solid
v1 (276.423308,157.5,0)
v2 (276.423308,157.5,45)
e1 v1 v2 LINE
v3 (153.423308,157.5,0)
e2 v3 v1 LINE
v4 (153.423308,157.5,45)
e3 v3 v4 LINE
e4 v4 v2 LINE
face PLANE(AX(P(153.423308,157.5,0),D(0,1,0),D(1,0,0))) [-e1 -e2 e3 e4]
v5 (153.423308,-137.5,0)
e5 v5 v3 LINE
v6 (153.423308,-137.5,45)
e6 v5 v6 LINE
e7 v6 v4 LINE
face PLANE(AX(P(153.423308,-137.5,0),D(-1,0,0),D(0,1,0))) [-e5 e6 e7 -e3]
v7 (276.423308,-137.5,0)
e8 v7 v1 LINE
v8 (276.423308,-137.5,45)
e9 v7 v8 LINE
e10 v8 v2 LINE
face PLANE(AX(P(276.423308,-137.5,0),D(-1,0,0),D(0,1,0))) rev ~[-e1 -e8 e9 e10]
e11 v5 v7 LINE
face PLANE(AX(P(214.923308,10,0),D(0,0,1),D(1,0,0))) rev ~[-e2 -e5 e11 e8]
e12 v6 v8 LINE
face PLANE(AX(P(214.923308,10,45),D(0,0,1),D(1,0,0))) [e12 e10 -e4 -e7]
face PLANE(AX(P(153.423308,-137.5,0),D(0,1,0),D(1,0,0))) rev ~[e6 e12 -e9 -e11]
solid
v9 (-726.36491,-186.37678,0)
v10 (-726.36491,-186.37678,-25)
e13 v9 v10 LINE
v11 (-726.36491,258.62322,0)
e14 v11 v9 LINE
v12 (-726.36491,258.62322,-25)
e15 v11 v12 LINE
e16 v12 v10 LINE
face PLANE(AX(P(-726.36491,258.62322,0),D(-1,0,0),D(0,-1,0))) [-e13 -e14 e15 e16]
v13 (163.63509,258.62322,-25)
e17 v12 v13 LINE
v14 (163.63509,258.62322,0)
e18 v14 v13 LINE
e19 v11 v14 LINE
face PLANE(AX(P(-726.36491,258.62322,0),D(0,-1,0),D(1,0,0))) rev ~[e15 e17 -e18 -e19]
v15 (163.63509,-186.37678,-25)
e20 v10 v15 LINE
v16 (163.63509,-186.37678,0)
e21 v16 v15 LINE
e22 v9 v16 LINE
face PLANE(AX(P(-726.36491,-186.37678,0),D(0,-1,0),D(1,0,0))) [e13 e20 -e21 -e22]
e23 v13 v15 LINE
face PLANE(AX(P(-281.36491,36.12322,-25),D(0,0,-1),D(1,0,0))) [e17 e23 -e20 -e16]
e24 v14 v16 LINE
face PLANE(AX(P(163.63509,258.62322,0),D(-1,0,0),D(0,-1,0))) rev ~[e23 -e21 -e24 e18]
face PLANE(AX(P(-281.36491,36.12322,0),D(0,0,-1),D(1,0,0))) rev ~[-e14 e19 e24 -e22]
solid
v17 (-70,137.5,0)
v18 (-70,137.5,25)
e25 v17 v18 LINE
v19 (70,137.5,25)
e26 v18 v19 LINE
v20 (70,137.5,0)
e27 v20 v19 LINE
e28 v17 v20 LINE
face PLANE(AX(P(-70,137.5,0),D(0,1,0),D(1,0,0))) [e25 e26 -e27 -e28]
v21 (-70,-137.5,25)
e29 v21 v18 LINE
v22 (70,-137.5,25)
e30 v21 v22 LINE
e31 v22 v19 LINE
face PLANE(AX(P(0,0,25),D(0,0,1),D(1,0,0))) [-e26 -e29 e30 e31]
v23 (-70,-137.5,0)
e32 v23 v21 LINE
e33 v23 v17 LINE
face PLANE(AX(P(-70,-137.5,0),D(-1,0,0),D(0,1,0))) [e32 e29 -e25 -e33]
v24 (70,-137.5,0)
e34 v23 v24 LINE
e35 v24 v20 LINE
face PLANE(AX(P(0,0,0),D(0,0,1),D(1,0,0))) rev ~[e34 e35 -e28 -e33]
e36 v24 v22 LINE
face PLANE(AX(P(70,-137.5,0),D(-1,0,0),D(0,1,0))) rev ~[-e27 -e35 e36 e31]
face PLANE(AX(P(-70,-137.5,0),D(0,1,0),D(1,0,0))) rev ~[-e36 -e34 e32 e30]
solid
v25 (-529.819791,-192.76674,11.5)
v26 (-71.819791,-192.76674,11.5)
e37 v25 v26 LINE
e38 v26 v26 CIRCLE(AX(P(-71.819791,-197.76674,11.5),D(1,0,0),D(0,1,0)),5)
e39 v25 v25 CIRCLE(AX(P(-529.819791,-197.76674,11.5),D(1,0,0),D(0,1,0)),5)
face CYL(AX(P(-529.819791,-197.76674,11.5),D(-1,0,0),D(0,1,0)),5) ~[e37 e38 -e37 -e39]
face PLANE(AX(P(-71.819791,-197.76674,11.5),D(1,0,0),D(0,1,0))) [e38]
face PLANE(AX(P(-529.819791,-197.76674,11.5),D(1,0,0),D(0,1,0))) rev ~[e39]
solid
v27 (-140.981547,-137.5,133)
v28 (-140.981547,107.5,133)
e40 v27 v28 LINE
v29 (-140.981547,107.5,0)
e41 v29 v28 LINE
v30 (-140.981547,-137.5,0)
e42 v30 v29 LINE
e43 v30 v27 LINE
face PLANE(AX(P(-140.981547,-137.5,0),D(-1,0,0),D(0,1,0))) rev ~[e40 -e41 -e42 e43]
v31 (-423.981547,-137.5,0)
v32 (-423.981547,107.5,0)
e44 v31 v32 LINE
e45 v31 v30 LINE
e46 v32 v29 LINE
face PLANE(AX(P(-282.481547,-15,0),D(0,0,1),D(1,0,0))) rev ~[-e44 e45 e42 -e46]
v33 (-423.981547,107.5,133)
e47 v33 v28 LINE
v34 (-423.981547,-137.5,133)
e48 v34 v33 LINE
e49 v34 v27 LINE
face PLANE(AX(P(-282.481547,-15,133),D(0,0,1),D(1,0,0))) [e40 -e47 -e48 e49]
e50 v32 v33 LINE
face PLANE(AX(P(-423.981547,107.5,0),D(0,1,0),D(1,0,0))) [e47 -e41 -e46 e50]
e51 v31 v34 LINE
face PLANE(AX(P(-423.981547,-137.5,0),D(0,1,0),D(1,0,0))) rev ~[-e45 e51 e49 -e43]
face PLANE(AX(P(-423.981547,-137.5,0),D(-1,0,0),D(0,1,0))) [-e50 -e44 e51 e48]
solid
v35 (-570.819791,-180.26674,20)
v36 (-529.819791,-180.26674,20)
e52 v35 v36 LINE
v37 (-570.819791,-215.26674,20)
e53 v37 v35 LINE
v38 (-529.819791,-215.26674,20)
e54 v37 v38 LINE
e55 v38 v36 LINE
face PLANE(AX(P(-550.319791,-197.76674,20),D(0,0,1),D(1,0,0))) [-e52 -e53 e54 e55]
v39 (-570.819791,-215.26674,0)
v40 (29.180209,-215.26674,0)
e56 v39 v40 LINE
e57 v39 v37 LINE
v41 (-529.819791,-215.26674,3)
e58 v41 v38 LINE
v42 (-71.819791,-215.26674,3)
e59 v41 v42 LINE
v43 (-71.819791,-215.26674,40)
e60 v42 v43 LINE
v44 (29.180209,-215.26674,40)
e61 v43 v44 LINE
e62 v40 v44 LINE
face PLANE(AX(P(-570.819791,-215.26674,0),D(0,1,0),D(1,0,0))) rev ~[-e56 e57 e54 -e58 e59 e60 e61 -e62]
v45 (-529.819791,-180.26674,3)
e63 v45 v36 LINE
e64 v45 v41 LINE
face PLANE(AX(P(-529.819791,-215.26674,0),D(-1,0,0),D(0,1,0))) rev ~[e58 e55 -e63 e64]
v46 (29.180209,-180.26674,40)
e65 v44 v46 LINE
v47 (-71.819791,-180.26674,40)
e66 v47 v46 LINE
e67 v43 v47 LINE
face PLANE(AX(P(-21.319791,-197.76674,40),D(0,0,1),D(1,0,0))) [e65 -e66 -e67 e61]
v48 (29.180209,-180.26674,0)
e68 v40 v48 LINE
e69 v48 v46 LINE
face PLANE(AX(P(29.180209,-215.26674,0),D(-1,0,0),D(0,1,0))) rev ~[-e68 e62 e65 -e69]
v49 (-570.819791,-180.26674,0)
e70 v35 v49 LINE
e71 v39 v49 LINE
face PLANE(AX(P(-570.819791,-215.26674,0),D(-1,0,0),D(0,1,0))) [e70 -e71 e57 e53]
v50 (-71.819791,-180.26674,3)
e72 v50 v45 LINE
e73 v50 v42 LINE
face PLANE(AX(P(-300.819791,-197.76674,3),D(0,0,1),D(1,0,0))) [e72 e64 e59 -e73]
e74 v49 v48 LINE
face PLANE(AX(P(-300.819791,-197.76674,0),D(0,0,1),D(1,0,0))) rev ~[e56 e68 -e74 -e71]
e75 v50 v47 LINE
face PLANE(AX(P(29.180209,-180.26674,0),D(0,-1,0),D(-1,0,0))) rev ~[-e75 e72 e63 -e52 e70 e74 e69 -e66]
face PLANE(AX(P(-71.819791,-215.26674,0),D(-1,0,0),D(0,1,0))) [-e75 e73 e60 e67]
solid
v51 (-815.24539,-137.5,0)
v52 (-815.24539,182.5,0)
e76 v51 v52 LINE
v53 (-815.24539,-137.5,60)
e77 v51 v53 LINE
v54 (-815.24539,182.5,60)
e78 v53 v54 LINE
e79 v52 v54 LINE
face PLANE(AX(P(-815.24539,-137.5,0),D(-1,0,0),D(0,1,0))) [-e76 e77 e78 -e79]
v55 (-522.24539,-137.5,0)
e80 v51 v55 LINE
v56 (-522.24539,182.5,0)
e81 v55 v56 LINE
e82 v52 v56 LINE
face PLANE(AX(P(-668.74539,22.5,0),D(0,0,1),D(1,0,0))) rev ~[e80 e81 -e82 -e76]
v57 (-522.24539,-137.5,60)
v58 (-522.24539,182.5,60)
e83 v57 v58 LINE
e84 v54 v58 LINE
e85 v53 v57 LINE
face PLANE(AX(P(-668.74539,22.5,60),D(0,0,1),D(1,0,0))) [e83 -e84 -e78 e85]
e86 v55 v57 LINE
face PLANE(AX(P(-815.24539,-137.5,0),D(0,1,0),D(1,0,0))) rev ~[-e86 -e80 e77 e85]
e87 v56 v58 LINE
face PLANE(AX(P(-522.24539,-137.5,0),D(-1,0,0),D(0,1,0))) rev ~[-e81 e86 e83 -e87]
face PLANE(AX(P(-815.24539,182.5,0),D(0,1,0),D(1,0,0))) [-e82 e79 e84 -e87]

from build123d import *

# Parameters (mm, degrees)
F0_W      = 140
F0_H      = 275
F1_DEPTH  = 25
F0_W_2    = 123
F0_H_2    = 295
F2_DEPTH  = 45
F0_W_3    = 293
F0_H_3    = 320
F3_DEPTH  = 60
F0_W_4    = 283
F0_H_4    = 245
F4_DEPTH  = 133
F5_W      = 890
F5_H      = 445
F6_DEPTH  = 25
F7_W      = 458
F7_H      = 35
F7_W_2    = 41
F7_W_3    = 101
F8_DEPTH  = 3
F9_DEPTH  = 20
F10_DEPTH = 40
F11_R     = 5
F12_DEPTH = 458


with BuildPart() as f1:
    # F0 (on Top) → F1 (new body)
    with BuildSketch(Plane.XY):
        Rectangle(F0_W, F0_H)
    extrude(amount=F1_DEPTH)


with BuildPart() as f2:
    # F0 (on Top) → F2 (new body)
    with BuildSketch(Plane.XY):
        with Locations((214.9233075308, 10)):
            Rectangle(F0_W_2, F0_H_2)
    extrude(amount=F2_DEPTH)


with BuildPart() as f3:
    # F0 (on Top) → F3 (new body)
    with BuildSketch(Plane.XY):
        with Locations((-668.7453899384, 22.5)):
            Rectangle(F0_W_3, F0_H_3)
    extrude(amount=F3_DEPTH)


with BuildPart() as f4:
    # F0 (on Top) → F4 (new body)
    with BuildSketch(Plane.XY):
        with Locations((-282.4815473557, -15)):
            Rectangle(F0_W_4, F0_H_4)
    extrude(amount=F4_DEPTH)


with BuildPart() as f6:
    # F5 (on face) → F6 (new body)
    with BuildSketch(Plane(origin=(0, 0, 0), x_dir=(1, 0, 0), z_dir=(0, 0, -1))):
        with Locations((-281.3649100065, -36.1232197285)):
            Rectangle(F5_W, F5_H)
    extrude(amount=F6_DEPTH)


with BuildPart() as f8:
    # F7 (on Top) → F8 (new body)
    with BuildSketch(Plane.XY):
        with Locations((-300.8197906613, -197.7667400182)):
            Rectangle(F7_W, F7_H)
        with Locations((-550.3197906613, -197.7667400182)):
            Rectangle(F7_W_2, F7_H)
        with Locations((-21.3197906613, -197.7667400182)):
            Rectangle(F7_W_3, F7_H)
    extrude(amount=F8_DEPTH)

    # F7 (on Top) → F9 (join)
    with BuildSketch(Plane.XY):
        with Locations((-550.3197906613, -197.7667400182)):
            Rectangle(F7_W_2, F7_H)
    extrude(amount=F9_DEPTH)

    # F7 (on Top) → F10 (join)
    with BuildSketch(Plane.XY):
        with Locations((-21.3197906613, -197.7667400182)):
            Rectangle(F7_W_3, F7_H)
    extrude(amount=F10_DEPTH)


with BuildPart() as f12:
    # F11 (on face) → F12 (new body, through all)
    with BuildSketch(Plane.YZ.offset(-529.8197906613)):
        with Locations((-197.7667400182, 11.5)):
            Circle(F11_R)
    extrude(amount=F12_DEPTH)


solid = Compound([f1.part, f2.part, f3.part, f4.part, f6.part, f8.part, f12.part])
